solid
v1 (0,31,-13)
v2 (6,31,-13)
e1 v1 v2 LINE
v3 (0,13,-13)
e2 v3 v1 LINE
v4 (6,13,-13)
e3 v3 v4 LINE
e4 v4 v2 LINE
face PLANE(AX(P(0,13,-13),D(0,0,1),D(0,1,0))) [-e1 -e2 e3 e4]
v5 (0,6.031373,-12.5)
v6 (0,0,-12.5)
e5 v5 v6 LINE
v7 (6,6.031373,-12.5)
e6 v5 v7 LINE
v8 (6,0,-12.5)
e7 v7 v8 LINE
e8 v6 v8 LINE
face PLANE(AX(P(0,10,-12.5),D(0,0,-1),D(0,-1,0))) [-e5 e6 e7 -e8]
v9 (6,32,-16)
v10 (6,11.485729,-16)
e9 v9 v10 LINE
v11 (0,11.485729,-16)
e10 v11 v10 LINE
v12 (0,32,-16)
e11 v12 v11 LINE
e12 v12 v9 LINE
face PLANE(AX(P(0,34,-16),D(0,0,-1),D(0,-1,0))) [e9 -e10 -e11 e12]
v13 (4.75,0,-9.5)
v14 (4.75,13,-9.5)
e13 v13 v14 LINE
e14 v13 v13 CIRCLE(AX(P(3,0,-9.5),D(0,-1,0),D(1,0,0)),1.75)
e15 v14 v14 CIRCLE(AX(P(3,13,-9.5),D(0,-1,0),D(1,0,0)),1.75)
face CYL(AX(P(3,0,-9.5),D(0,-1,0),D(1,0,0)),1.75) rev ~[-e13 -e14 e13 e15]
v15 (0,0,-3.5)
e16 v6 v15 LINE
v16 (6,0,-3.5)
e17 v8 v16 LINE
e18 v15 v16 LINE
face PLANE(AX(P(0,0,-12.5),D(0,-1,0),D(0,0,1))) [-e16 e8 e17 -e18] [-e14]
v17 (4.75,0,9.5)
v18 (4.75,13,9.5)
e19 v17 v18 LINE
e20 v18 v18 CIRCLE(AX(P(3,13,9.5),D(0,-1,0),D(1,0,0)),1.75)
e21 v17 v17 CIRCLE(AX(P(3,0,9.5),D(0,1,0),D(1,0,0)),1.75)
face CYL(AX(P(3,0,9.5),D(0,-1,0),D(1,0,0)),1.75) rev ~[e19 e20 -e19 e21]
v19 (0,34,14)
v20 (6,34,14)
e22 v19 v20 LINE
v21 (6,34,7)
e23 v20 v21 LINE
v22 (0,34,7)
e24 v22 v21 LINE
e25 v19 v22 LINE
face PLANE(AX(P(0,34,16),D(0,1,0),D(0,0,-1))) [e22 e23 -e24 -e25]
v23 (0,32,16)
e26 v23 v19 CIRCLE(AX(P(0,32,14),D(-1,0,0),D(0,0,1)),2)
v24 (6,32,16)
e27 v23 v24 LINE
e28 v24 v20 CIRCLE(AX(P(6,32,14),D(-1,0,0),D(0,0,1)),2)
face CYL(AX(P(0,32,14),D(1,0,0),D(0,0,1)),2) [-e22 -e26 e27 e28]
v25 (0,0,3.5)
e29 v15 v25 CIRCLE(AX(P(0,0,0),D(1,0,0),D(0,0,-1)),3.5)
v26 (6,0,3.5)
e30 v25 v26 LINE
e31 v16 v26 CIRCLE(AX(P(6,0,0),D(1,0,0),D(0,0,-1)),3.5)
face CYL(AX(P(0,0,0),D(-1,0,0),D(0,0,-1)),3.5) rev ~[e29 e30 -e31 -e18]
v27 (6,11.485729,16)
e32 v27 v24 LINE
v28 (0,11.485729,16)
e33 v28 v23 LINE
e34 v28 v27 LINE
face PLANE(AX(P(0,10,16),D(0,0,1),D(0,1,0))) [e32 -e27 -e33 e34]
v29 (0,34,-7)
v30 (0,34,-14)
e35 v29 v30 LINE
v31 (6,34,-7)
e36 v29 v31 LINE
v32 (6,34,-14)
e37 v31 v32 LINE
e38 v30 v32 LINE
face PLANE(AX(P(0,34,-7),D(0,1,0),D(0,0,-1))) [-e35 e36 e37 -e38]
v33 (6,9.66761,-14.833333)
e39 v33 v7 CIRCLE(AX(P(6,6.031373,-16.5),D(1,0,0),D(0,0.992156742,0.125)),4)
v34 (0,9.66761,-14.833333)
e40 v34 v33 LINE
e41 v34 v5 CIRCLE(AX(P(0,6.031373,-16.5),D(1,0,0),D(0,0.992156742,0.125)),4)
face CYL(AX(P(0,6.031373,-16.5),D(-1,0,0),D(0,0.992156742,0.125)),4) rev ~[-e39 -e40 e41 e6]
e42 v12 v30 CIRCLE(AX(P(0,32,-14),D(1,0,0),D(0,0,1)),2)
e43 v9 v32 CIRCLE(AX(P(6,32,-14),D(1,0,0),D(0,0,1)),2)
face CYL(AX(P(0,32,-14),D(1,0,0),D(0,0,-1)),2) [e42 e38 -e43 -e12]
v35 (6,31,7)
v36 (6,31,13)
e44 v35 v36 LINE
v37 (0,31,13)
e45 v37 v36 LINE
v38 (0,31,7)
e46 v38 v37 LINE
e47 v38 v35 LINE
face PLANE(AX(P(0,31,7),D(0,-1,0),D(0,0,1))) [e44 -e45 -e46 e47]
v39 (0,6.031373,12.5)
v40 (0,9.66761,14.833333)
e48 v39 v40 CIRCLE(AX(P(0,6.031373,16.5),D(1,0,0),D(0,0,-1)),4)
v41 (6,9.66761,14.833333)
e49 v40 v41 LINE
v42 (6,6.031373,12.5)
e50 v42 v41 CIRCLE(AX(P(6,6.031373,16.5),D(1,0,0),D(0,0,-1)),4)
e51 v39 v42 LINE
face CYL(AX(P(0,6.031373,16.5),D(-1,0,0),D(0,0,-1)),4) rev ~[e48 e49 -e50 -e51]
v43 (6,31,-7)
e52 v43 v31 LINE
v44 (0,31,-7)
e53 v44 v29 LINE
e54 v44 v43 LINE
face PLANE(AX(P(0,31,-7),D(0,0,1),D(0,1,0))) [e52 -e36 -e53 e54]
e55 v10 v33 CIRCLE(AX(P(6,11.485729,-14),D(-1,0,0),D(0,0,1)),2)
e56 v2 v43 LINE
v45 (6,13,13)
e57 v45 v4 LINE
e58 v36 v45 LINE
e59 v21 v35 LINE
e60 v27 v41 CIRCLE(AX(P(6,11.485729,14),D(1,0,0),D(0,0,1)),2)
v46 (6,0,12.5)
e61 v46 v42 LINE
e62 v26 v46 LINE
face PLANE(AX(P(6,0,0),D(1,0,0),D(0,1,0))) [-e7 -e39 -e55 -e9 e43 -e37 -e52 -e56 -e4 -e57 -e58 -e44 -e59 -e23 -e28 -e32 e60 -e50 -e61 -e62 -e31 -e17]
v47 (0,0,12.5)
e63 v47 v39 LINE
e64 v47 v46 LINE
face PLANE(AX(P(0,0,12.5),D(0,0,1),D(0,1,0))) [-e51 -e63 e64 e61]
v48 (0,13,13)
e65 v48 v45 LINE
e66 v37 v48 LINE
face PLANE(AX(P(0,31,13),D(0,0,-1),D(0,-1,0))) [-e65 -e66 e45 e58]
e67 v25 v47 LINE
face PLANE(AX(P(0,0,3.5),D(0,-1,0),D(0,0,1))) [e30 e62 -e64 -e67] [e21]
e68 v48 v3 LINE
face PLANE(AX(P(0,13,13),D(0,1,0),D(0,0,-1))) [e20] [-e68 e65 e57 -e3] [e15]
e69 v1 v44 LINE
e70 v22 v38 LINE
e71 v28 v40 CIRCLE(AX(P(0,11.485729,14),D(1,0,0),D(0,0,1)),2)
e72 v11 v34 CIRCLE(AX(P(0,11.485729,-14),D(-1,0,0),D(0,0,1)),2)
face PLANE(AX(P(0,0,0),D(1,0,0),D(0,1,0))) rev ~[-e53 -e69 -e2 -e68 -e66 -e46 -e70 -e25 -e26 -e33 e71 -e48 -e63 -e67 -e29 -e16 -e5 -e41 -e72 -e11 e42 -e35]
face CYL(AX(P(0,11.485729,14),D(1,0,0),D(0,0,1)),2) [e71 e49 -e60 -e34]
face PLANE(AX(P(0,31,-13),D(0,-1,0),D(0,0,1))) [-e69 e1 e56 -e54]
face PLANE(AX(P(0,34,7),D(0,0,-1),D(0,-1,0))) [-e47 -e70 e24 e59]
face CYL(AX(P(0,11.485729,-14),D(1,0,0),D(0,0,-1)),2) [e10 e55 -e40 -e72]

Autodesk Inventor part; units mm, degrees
ref_plane "YZ Plane" through (0, 0, 0) normal (1, 0, 0) x (0, 1, 0)
ref_plane "XZ Plane" through (0, 0, 0) normal (0, 1, 0) x (-1, 0, 0)
ref_plane "XY Plane" through (0, 0, 0) normal (0, 0, 1) x (1, 0, 0)
sketch "Esquisse1" plane through (0, 0, 0) normal (1, 0, 0) x (0, 1, 0)
  arc A0 (0, -3.5) -> (0, 3.5) centre (0, 0) ccw
  line L0 (0, 6.2947) -> (0, -6.5718) construction
  line L1 (0, 3.5) -> (0, 12.5)
  line L2 (0, 12.5) -> (10, 12.5)
  line L3 (10, -12.5) -> (0, -12.5)
  line L4 (0, -12.5) -> (0, -3.5)
  line L5 (10, 12.5) -> (10, 16)
  line L6 (10, 16) -> (34, 16)
  line L7 (34, 16) -> (34, 7)
  line L8 (34, 7) -> (31, 7)
  line L9 (31, 7) -> (31, 13)
  line L10 (31, 13) -> (13, 13)
  line L11 (13, 13) -> (13, -13)
  line L12 (13, -13) -> (31, -13)
  line L13 (31, -13) -> (31, -7)
  line L14 (31, -7) -> (34, -7)
  line L15 (34, -7) -> (34, -16)
  line L16 (34, -16) -> (10, -16)
  line L17 (10, -16) -> (10, -12.5)
  point P0 (22, 13)
  dimension "d16" = 3.5
  dimension "d17" = 25
  dimension "d18" = 26
  dimension "d19" = 6
  dimension "d20" = 3
  dimension "d21" = 3
  dimension "d22" = 3
  dimension "d23" = 18
  dimension "d24" = 3
  dimension "d25" = 10
extrude "Extrusion1" add sketch "Esquisse1" along normal blind 6
fillet "Congé1" radius 4 2 edges at (3, 10, 12.5) (3, 10, -12.5)
fillet "Congé2" radius 2 2 edges at (3, 10, -16) (3, 10, 16)
fillet "Congé3" radius 2 2 edges at (3, 34, 16) (3, 34, -16)
sketch "Esquisse2" plane through (0, 0, -12.5) normal (0, -1, 0) x (1, 0, 0)
  circle A0 centre (3, 3) radius 1.75
  line L0 (0, -1.5) -> (0, 5.5) projected
  line L1 (6, -0.5) -> (6, 25.5) projected
  line L2 (0, -0.5) -> (0, 25.5) projected
  line L3 (0, 0) -> (6, 0) projected
  point P0 (0, 12.5)
  point P1 (3, 3)
  dimension "d28" = 3.5
  dimension "d31" = 3
  dimension "d32" = 3
extrude "Extrusion2" cut sketch "Esquisse2" against normal blind 15
mirror "Mise en miroir1" about plane through (0, 0, 0) normal (0, 0, 1) of "Extrusion2"
properties part number "Bras_1_Impression 3D"
